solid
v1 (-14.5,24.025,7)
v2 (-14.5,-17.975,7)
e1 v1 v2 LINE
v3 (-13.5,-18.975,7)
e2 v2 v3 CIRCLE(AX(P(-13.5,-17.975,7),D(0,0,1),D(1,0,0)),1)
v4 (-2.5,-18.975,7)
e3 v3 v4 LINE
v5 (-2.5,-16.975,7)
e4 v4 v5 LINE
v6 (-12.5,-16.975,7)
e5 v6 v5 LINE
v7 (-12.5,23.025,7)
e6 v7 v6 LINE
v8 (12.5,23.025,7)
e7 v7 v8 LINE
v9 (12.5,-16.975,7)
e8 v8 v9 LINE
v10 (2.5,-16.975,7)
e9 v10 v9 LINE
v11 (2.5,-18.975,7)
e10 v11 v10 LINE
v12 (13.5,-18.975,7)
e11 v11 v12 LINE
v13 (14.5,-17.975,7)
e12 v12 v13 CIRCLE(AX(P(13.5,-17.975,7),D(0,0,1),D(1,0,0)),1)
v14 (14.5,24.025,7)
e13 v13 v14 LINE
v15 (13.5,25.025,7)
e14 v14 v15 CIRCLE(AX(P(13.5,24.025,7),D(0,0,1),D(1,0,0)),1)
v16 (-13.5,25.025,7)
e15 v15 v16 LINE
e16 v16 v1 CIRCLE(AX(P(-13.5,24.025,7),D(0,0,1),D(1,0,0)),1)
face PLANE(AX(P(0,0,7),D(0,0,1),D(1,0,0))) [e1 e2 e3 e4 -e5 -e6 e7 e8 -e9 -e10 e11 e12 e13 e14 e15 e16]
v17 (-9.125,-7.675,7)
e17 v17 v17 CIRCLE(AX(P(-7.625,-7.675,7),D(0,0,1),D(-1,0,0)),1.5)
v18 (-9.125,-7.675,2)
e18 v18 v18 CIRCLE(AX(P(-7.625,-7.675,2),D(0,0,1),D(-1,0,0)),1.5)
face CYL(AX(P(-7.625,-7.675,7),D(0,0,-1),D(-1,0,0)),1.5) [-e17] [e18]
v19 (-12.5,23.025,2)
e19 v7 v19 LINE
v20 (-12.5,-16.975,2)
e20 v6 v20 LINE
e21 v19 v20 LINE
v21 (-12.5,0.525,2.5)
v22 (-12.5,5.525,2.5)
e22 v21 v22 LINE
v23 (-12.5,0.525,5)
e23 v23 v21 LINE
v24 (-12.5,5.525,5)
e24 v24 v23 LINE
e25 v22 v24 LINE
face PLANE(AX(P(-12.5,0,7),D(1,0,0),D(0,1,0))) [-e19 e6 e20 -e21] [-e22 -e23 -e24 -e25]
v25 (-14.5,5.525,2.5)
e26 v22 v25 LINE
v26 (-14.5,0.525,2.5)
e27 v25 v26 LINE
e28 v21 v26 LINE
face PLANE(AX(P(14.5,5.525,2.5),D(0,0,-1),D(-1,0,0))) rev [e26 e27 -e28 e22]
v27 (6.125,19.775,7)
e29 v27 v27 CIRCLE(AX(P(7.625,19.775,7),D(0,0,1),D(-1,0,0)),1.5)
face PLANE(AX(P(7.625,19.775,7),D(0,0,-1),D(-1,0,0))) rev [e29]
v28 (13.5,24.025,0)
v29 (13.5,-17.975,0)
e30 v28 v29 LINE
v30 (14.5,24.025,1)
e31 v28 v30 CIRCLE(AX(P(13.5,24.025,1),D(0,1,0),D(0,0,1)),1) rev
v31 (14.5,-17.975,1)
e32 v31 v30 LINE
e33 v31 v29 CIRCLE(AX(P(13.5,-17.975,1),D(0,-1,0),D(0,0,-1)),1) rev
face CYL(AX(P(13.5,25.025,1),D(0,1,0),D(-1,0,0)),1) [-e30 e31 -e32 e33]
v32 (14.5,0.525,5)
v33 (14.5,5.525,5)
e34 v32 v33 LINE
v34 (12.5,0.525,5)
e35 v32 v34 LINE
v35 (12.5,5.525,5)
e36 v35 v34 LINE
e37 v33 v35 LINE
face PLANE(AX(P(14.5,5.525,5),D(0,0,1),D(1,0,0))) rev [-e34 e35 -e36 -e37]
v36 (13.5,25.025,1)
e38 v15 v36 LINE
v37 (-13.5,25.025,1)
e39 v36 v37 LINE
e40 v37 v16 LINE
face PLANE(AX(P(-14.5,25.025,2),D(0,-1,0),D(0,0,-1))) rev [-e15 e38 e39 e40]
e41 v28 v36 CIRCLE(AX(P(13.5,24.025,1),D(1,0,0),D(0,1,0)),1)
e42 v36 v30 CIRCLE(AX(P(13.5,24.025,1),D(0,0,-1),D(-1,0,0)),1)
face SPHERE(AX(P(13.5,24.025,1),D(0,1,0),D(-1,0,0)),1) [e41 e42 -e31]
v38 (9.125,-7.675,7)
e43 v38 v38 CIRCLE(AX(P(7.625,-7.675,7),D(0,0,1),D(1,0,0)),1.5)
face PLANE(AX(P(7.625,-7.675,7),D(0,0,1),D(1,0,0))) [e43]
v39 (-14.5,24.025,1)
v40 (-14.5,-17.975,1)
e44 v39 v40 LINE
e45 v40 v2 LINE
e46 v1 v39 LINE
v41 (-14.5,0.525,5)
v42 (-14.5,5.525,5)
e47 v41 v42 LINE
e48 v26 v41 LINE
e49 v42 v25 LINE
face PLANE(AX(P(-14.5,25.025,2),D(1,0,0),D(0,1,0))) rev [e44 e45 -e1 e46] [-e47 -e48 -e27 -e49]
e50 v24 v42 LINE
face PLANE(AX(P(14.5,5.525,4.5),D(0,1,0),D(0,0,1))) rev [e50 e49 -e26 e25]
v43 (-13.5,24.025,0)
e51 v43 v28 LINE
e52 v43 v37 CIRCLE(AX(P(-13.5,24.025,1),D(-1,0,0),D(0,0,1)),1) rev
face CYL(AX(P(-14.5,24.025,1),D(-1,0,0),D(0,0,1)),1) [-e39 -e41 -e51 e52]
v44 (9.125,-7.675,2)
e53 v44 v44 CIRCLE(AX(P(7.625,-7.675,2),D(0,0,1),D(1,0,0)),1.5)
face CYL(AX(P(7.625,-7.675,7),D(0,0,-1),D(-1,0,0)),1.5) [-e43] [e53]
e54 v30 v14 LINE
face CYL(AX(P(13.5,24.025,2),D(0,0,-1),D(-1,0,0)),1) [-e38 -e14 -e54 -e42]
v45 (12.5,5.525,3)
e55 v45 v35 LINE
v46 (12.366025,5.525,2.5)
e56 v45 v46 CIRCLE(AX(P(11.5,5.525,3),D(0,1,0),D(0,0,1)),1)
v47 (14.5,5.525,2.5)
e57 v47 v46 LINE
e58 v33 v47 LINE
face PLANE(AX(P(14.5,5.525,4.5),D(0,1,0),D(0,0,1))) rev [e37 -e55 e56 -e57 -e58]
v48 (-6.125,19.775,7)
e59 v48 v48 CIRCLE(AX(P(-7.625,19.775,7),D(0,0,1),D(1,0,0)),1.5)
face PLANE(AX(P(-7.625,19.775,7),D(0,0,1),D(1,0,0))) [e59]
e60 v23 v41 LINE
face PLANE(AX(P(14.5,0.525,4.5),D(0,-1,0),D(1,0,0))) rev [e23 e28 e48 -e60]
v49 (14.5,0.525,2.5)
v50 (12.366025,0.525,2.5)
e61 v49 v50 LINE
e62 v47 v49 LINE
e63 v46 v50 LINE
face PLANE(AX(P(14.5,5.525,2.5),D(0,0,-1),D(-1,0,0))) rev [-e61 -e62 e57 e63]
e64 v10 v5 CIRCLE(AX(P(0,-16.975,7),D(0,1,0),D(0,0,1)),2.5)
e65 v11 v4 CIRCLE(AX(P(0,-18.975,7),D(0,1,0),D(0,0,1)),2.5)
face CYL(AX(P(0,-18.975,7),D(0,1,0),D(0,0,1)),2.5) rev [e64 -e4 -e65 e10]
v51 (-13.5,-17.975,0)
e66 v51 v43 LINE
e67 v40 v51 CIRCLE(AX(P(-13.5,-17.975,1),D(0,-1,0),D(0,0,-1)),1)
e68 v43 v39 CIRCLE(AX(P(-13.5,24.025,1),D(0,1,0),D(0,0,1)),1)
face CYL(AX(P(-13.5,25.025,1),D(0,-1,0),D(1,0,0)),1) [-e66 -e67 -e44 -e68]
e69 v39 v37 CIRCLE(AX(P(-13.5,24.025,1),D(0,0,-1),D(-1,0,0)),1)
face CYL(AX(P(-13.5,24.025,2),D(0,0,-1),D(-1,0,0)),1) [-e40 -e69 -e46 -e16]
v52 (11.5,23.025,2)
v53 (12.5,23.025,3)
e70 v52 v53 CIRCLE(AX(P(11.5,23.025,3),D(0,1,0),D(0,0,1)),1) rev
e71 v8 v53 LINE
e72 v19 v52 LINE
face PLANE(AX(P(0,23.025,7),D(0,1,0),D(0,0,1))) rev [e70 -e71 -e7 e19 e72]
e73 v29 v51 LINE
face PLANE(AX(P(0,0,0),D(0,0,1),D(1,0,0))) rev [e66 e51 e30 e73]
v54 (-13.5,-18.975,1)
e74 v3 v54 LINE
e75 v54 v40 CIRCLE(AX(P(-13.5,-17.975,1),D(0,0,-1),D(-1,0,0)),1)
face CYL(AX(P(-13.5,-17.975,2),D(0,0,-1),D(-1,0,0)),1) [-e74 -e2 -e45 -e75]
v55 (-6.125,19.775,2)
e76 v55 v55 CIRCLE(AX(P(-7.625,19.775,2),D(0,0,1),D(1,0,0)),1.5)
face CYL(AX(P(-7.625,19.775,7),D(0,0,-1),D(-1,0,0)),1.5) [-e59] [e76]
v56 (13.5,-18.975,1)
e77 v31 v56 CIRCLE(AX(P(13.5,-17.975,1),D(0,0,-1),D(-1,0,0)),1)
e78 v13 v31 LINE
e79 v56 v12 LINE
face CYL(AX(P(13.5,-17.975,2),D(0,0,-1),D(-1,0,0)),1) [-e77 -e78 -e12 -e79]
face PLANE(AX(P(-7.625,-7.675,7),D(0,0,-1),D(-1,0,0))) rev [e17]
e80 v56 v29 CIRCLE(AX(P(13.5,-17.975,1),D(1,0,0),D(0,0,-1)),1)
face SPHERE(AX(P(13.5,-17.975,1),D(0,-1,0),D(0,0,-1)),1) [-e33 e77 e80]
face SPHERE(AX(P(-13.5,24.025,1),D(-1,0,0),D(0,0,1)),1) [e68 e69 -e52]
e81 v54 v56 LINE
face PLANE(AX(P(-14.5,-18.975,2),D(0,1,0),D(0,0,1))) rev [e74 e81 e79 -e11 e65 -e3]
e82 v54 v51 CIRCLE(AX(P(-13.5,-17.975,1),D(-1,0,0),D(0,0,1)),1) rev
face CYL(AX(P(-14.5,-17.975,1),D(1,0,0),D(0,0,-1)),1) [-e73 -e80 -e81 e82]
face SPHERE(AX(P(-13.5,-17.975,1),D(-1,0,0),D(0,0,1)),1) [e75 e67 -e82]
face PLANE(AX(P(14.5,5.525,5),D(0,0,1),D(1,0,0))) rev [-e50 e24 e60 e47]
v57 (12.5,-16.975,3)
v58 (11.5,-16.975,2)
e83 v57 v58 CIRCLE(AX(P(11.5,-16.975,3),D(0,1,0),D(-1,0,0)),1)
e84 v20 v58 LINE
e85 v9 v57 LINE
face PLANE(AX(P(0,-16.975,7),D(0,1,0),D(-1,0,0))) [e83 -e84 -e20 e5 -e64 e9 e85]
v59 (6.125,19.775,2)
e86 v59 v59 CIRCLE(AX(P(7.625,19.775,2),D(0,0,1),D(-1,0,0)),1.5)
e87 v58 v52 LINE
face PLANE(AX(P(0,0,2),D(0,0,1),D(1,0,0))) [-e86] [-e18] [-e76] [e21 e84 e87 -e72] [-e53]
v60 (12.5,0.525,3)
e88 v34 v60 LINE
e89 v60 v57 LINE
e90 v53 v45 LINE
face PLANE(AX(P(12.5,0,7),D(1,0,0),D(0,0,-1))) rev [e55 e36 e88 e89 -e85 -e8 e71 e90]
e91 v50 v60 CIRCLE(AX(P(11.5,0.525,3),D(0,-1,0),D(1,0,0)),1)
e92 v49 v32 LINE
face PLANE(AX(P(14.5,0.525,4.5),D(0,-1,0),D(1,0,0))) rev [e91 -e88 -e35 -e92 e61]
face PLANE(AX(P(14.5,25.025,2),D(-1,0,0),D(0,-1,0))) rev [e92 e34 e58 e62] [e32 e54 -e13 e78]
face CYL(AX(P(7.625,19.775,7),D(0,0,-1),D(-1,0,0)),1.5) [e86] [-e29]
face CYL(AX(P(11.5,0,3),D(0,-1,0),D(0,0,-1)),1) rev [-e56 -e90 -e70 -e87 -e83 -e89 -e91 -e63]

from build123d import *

# Parameters (mm, degrees)
SKETCH1_W           = 29
SKETCH1_H           = 44
BOSS_EXTRUDE1_DEPTH = 2
SKETCH2_W           = 29
SKETCH2_H           = 44
BOSS_EXTRUDE2_DEPTH = 5
CUT_EXTRUDE1_DEPTH  = 45.980551353
CUT_EXTRUDE2_DEPTH  = 39.93906297
SKETCH8_R           = 1.5
BOSS_EXTRUDE3_DEPTH = 5
FILLET1_R           = 1


with BuildPart() as part:
    # Sketch1 → Boss-Extrude1 (new body)
    with BuildSketch(Plane.XY):
        with Locations((0, 3.025)):
            Rectangle(SKETCH1_W, SKETCH1_H)
    extrude(amount=BOSS_EXTRUDE1_DEPTH)

    # Sketch2 → Boss-Extrude2 (add)
    with BuildSketch(Plane.XY.offset(2)):
        with Locations((0, 3.025)):
            Rectangle(SKETCH2_W, SKETCH2_H)
        Polygon((12.5, 23.025), (12.5, 16.975), (12.5, -16.975), (-12.5, -16.975), (-12.5, 16.975), (-12.5, 23.025), align=None, mode=Mode.SUBTRACT)
    extrude(amount=BOSS_EXTRUDE2_DEPTH)

    # Sketch4 → Cut-Extrude1 (cut, through all)
    with BuildSketch(Plane(origin=(0, -16.975, 0), x_dir=(1, 0, 0), z_dir=(0, 1, 0))):
        with BuildLine():
            Line((-2.5, -7), (2.5, -7))
            ThreePointArc((2.5, -7), (0, -4.5), (-2.5, -7))
        make_face()
    extrude(amount=-CUT_EXTRUDE1_DEPTH, mode=Mode.SUBTRACT)

    # Sketch5 → Cut-Extrude2 (cut, through all)
    with BuildSketch(Plane.ZY.offset(14.5)):
        Polygon((5, 5.525), (5, 0.525), (4.5, 0.525), (2.5, 0.525), (2.5, 5.525), (4.5, 5.525), align=None)
    extrude(amount=-CUT_EXTRUDE2_DEPTH, mode=Mode.SUBTRACT)

    # Sketch8 → Boss-Extrude3 (add)
    with BuildSketch(Plane.XY.offset(2)):
        with Locations((-7.625, 19.775)):
            Circle(SKETCH8_R)
        with Locations(Location((-7.625, -7.675, 0), (0, 0, 180))):
            Circle(SKETCH8_R)
        with Locations((7.625, -7.675)):
            Circle(SKETCH8_R)
        with Locations(Location((7.625, 19.775, 0), (0, 0, 180))):
            Circle(SKETCH8_R)
    extrude(amount=BOSS_EXTRUDE3_DEPTH)

    # Fillet1
    # the kernel refuses this fillet: 1 mm, written as the material it adds along each edge
    with BuildSketch(Plane(origin=(12.5, 23.025, 2), x_dir=(0, 0, 1), z_dir=(0, -1, 0))) as fillet1_piece_1_section:
        with BuildLine():
            CenterArc((FILLET1_R, FILLET1_R), FILLET1_R, 180, 90)
            Line((0, FILLET1_R), (0, 0))
            Line((0, 0), (FILLET1_R, 0))
        make_face()
    fillet1_piece_1 = extrude(amount=42.5, mode=Mode.PRIVATE)
    fillet1_piece_1 = split(fillet1_piece_1, bisect_by=Plane(origin=(12.460315407, 5.525, 2.623263613), z_dir=(0, 1, 0)), keep=Keep.TOP, mode=Mode.PRIVATE)
    add(fillet1_piece_1)
    with BuildSketch(Plane(origin=(12.5, 25.525, 2), x_dir=(0, 0, 1), z_dir=(0, -1, 0))) as fillet1_piece_2_section:
        with BuildLine():
            CenterArc((FILLET1_R, FILLET1_R), FILLET1_R, 180, 90)
            Line((0, FILLET1_R), (0, 0))
            Line((0, 0), (FILLET1_R, 0))
        make_face()
    fillet1_piece_2 = extrude(amount=42.5, mode=Mode.PRIVATE)
    fillet1_piece_2 = split(fillet1_piece_2, bisect_by=Plane(origin=(12.255975151, 3.025, 2.5), z_dir=(0, 0, -1)), keep=Keep.TOP, mode=Mode.PRIVATE)
    fillet1_piece_2 = split(fillet1_piece_2, bisect_by=Plane(origin=(12.255975151, 5.525, 2.17839593), z_dir=(0, -1, 0)), keep=Keep.TOP, mode=Mode.PRIVATE)
    add(fillet1_piece_2)
    with BuildSketch(Plane(origin=(12.5, 25.525, 2), x_dir=(0, 0, 1), z_dir=(0, -1, 0))) as fillet1_piece_3_section:
        with BuildLine():
            CenterArc((FILLET1_R, FILLET1_R), FILLET1_R, 180, 90)
            Line((0, FILLET1_R), (0, 0))
            Line((0, 0), (FILLET1_R, 0))
        make_face()
    fillet1_piece_3 = extrude(amount=42.5, mode=Mode.PRIVATE)
    fillet1_piece_3 = split(fillet1_piece_3, bisect_by=Plane(origin=(12.460315407, 0.525, 2.623263613), z_dir=(0, -1, 0)), keep=Keep.TOP, mode=Mode.PRIVATE)
    add(fillet1_piece_3)
    # the kernel refuses this fillet: 1 mm, written as the material it takes off along each edge
    with BuildSketch(Plane(origin=(13.5, 24.025, 1), x_dir=(0, 0, -1), z_dir=(0, 1, 0))) as fillet1_2_piece_1_section:
        Polygon((0, 0), (FILLET1_R * 1.02, 0), (FILLET1_R * 1.02, -FILLET1_R * 1.02), (0, -FILLET1_R * 1.02), align=None)
    fillet1_2_piece_1 = extrude(amount=FILLET1_R * 1.02, mode=Mode.PRIVATE)
    fillet1_2_piece_1 = fillet1_2_piece_1 - Plane(origin=(13.5, 24.025, 1), x_dir=(-0.7071067811865475, 0, 0.7071067811865475), z_dir=(0, 1, 0)) * Sphere(FILLET1_R, mode=Mode.PRIVATE)
    add(fillet1_2_piece_1, mode=Mode.SUBTRACT)
    with BuildSketch(Plane(origin=(13.5, -17.975, 1), x_dir=(1, 0, 0), z_dir=(0, 0, -1))) as fillet1_2_piece_2_section:
        Polygon((0, 0), (FILLET1_R * 1.02, 0), (FILLET1_R * 1.02, FILLET1_R * 1.02), (0, FILLET1_R * 1.02), align=None)
    fillet1_2_piece_2 = extrude(amount=FILLET1_R * 1.02, mode=Mode.PRIVATE)
    fillet1_2_piece_2 = fillet1_2_piece_2 - Plane(origin=(13.5, -17.975, 1), x_dir=(-0.7071067811865476, 0.7071067811865475, 0), z_dir=(0, 0, -1)) * Sphere(FILLET1_R, mode=Mode.PRIVATE)
    add(fillet1_2_piece_2, mode=Mode.SUBTRACT)
    with BuildSketch(Plane(origin=(-13.5, -17.975, 1), x_dir=(0, -1, 0), z_dir=(0, 0, -1))) as fillet1_2_piece_3_section:
        Polygon((0, 0), (FILLET1_R * 1.02, 0), (FILLET1_R * 1.02, FILLET1_R * 1.02), (0, FILLET1_R * 1.02), align=None)
    fillet1_2_piece_3 = extrude(amount=FILLET1_R * 1.02, mode=Mode.PRIVATE)
    fillet1_2_piece_3 = fillet1_2_piece_3 - Plane(origin=(-13.5, -17.975, 1), x_dir=(0.7071067811865475, 0.7071067811865477, 0), z_dir=(0, 0, -1)) * Sphere(FILLET1_R, mode=Mode.PRIVATE)
    add(fillet1_2_piece_3, mode=Mode.SUBTRACT)
    with BuildSketch(Plane(origin=(-13.5, 24.025, 1), x_dir=(0, 0, -1), z_dir=(0, 1, 0))) as fillet1_2_piece_4_section:
        Polygon((0, 0), (FILLET1_R * 1.02, 0), (FILLET1_R * 1.02, FILLET1_R * 1.02), (0, FILLET1_R * 1.02), align=None)
    fillet1_2_piece_4 = extrude(amount=FILLET1_R * 1.02, mode=Mode.PRIVATE)
    fillet1_2_piece_4 = fillet1_2_piece_4 - Plane(origin=(-13.5, 24.025, 1), x_dir=(0.7071067811865475, 0, 0.7071067811865475), z_dir=(0, 1, 0)) * Sphere(FILLET1_R, mode=Mode.PRIVATE)
    add(fillet1_2_piece_4, mode=Mode.SUBTRACT)
    with BuildSketch(Plane(origin=(14.5, 24.025, 0), x_dir=(-1, 0, 0), z_dir=(0, -1, 0)), Plane(origin=(-14.5, -17.975, 0), x_dir=(1, 0, 0), z_dir=(0, 1, 0))) as fillet1_2_piece_5:
        with BuildLine():
            CenterArc((FILLET1_R, -FILLET1_R), FILLET1_R, 90, 90)
            Line((0, -FILLET1_R), (0, 0))
            Line((0, 0), (FILLET1_R, 0))
        make_face()
    extrude(amount=42, mode=Mode.SUBTRACT)
    with BuildSketch(Plane(origin=(13.5, -18.975, 0), x_dir=(0, 1, 0), z_dir=(-1, 0, 0))) as fillet1_2_piece_6:
        with BuildLine():
            CenterArc((FILLET1_R, -FILLET1_R), FILLET1_R, 90, 90)
            Line((0, -FILLET1_R), (0, 0))
            Line((0, 0), (FILLET1_R, 0))
        make_face()
    extrude(amount=27, mode=Mode.SUBTRACT)
    with BuildSketch(Plane(origin=(14.5, -18.975, 9.5), x_dir=(-1, 0, 0), z_dir=(0, 0, -1)), Plane(origin=(-14.5, -18.975, 1), x_dir=(1, 0, 0), z_dir=(0, 0, 1))) as fillet1_2_piece_7:
        with BuildLine():
            CenterArc((FILLET1_R, FILLET1_R), FILLET1_R, 180, 90)
            Line((0, FILLET1_R), (0, 0))
            Line((0, 0), (FILLET1_R, 0))
        make_face()
    extrude(amount=8.5, mode=Mode.SUBTRACT)
    with BuildSketch(Plane(origin=(-14.5, 25.025, 1), x_dir=(1, 0, 0), z_dir=(0, 0, 1)), Plane(origin=(14.5, 25.025, 9.5), x_dir=(-1, 0, 0), z_dir=(0, 0, -1))) as fillet1_2_piece_8:
        with BuildLine():
            CenterArc((FILLET1_R, -FILLET1_R), FILLET1_R, 90, 90)
            Line((0, -FILLET1_R), (0, 0))
            Line((0, 0), (FILLET1_R, 0))
        make_face()
    extrude(amount=8.5, mode=Mode.SUBTRACT)
    with BuildSketch(Plane(origin=(-13.5, 25.025, 0), x_dir=(0, 0, 1), z_dir=(1, 0, 0))) as fillet1_2_piece_9:
        with BuildLine():
            CenterArc((FILLET1_R, FILLET1_R), FILLET1_R, 180, 90)
            Line((0, FILLET1_R), (0, 0))
            Line((0, 0), (FILLET1_R, 0))
        make_face()
    extrude(amount=27, mode=Mode.SUBTRACT)


solid = part.part
